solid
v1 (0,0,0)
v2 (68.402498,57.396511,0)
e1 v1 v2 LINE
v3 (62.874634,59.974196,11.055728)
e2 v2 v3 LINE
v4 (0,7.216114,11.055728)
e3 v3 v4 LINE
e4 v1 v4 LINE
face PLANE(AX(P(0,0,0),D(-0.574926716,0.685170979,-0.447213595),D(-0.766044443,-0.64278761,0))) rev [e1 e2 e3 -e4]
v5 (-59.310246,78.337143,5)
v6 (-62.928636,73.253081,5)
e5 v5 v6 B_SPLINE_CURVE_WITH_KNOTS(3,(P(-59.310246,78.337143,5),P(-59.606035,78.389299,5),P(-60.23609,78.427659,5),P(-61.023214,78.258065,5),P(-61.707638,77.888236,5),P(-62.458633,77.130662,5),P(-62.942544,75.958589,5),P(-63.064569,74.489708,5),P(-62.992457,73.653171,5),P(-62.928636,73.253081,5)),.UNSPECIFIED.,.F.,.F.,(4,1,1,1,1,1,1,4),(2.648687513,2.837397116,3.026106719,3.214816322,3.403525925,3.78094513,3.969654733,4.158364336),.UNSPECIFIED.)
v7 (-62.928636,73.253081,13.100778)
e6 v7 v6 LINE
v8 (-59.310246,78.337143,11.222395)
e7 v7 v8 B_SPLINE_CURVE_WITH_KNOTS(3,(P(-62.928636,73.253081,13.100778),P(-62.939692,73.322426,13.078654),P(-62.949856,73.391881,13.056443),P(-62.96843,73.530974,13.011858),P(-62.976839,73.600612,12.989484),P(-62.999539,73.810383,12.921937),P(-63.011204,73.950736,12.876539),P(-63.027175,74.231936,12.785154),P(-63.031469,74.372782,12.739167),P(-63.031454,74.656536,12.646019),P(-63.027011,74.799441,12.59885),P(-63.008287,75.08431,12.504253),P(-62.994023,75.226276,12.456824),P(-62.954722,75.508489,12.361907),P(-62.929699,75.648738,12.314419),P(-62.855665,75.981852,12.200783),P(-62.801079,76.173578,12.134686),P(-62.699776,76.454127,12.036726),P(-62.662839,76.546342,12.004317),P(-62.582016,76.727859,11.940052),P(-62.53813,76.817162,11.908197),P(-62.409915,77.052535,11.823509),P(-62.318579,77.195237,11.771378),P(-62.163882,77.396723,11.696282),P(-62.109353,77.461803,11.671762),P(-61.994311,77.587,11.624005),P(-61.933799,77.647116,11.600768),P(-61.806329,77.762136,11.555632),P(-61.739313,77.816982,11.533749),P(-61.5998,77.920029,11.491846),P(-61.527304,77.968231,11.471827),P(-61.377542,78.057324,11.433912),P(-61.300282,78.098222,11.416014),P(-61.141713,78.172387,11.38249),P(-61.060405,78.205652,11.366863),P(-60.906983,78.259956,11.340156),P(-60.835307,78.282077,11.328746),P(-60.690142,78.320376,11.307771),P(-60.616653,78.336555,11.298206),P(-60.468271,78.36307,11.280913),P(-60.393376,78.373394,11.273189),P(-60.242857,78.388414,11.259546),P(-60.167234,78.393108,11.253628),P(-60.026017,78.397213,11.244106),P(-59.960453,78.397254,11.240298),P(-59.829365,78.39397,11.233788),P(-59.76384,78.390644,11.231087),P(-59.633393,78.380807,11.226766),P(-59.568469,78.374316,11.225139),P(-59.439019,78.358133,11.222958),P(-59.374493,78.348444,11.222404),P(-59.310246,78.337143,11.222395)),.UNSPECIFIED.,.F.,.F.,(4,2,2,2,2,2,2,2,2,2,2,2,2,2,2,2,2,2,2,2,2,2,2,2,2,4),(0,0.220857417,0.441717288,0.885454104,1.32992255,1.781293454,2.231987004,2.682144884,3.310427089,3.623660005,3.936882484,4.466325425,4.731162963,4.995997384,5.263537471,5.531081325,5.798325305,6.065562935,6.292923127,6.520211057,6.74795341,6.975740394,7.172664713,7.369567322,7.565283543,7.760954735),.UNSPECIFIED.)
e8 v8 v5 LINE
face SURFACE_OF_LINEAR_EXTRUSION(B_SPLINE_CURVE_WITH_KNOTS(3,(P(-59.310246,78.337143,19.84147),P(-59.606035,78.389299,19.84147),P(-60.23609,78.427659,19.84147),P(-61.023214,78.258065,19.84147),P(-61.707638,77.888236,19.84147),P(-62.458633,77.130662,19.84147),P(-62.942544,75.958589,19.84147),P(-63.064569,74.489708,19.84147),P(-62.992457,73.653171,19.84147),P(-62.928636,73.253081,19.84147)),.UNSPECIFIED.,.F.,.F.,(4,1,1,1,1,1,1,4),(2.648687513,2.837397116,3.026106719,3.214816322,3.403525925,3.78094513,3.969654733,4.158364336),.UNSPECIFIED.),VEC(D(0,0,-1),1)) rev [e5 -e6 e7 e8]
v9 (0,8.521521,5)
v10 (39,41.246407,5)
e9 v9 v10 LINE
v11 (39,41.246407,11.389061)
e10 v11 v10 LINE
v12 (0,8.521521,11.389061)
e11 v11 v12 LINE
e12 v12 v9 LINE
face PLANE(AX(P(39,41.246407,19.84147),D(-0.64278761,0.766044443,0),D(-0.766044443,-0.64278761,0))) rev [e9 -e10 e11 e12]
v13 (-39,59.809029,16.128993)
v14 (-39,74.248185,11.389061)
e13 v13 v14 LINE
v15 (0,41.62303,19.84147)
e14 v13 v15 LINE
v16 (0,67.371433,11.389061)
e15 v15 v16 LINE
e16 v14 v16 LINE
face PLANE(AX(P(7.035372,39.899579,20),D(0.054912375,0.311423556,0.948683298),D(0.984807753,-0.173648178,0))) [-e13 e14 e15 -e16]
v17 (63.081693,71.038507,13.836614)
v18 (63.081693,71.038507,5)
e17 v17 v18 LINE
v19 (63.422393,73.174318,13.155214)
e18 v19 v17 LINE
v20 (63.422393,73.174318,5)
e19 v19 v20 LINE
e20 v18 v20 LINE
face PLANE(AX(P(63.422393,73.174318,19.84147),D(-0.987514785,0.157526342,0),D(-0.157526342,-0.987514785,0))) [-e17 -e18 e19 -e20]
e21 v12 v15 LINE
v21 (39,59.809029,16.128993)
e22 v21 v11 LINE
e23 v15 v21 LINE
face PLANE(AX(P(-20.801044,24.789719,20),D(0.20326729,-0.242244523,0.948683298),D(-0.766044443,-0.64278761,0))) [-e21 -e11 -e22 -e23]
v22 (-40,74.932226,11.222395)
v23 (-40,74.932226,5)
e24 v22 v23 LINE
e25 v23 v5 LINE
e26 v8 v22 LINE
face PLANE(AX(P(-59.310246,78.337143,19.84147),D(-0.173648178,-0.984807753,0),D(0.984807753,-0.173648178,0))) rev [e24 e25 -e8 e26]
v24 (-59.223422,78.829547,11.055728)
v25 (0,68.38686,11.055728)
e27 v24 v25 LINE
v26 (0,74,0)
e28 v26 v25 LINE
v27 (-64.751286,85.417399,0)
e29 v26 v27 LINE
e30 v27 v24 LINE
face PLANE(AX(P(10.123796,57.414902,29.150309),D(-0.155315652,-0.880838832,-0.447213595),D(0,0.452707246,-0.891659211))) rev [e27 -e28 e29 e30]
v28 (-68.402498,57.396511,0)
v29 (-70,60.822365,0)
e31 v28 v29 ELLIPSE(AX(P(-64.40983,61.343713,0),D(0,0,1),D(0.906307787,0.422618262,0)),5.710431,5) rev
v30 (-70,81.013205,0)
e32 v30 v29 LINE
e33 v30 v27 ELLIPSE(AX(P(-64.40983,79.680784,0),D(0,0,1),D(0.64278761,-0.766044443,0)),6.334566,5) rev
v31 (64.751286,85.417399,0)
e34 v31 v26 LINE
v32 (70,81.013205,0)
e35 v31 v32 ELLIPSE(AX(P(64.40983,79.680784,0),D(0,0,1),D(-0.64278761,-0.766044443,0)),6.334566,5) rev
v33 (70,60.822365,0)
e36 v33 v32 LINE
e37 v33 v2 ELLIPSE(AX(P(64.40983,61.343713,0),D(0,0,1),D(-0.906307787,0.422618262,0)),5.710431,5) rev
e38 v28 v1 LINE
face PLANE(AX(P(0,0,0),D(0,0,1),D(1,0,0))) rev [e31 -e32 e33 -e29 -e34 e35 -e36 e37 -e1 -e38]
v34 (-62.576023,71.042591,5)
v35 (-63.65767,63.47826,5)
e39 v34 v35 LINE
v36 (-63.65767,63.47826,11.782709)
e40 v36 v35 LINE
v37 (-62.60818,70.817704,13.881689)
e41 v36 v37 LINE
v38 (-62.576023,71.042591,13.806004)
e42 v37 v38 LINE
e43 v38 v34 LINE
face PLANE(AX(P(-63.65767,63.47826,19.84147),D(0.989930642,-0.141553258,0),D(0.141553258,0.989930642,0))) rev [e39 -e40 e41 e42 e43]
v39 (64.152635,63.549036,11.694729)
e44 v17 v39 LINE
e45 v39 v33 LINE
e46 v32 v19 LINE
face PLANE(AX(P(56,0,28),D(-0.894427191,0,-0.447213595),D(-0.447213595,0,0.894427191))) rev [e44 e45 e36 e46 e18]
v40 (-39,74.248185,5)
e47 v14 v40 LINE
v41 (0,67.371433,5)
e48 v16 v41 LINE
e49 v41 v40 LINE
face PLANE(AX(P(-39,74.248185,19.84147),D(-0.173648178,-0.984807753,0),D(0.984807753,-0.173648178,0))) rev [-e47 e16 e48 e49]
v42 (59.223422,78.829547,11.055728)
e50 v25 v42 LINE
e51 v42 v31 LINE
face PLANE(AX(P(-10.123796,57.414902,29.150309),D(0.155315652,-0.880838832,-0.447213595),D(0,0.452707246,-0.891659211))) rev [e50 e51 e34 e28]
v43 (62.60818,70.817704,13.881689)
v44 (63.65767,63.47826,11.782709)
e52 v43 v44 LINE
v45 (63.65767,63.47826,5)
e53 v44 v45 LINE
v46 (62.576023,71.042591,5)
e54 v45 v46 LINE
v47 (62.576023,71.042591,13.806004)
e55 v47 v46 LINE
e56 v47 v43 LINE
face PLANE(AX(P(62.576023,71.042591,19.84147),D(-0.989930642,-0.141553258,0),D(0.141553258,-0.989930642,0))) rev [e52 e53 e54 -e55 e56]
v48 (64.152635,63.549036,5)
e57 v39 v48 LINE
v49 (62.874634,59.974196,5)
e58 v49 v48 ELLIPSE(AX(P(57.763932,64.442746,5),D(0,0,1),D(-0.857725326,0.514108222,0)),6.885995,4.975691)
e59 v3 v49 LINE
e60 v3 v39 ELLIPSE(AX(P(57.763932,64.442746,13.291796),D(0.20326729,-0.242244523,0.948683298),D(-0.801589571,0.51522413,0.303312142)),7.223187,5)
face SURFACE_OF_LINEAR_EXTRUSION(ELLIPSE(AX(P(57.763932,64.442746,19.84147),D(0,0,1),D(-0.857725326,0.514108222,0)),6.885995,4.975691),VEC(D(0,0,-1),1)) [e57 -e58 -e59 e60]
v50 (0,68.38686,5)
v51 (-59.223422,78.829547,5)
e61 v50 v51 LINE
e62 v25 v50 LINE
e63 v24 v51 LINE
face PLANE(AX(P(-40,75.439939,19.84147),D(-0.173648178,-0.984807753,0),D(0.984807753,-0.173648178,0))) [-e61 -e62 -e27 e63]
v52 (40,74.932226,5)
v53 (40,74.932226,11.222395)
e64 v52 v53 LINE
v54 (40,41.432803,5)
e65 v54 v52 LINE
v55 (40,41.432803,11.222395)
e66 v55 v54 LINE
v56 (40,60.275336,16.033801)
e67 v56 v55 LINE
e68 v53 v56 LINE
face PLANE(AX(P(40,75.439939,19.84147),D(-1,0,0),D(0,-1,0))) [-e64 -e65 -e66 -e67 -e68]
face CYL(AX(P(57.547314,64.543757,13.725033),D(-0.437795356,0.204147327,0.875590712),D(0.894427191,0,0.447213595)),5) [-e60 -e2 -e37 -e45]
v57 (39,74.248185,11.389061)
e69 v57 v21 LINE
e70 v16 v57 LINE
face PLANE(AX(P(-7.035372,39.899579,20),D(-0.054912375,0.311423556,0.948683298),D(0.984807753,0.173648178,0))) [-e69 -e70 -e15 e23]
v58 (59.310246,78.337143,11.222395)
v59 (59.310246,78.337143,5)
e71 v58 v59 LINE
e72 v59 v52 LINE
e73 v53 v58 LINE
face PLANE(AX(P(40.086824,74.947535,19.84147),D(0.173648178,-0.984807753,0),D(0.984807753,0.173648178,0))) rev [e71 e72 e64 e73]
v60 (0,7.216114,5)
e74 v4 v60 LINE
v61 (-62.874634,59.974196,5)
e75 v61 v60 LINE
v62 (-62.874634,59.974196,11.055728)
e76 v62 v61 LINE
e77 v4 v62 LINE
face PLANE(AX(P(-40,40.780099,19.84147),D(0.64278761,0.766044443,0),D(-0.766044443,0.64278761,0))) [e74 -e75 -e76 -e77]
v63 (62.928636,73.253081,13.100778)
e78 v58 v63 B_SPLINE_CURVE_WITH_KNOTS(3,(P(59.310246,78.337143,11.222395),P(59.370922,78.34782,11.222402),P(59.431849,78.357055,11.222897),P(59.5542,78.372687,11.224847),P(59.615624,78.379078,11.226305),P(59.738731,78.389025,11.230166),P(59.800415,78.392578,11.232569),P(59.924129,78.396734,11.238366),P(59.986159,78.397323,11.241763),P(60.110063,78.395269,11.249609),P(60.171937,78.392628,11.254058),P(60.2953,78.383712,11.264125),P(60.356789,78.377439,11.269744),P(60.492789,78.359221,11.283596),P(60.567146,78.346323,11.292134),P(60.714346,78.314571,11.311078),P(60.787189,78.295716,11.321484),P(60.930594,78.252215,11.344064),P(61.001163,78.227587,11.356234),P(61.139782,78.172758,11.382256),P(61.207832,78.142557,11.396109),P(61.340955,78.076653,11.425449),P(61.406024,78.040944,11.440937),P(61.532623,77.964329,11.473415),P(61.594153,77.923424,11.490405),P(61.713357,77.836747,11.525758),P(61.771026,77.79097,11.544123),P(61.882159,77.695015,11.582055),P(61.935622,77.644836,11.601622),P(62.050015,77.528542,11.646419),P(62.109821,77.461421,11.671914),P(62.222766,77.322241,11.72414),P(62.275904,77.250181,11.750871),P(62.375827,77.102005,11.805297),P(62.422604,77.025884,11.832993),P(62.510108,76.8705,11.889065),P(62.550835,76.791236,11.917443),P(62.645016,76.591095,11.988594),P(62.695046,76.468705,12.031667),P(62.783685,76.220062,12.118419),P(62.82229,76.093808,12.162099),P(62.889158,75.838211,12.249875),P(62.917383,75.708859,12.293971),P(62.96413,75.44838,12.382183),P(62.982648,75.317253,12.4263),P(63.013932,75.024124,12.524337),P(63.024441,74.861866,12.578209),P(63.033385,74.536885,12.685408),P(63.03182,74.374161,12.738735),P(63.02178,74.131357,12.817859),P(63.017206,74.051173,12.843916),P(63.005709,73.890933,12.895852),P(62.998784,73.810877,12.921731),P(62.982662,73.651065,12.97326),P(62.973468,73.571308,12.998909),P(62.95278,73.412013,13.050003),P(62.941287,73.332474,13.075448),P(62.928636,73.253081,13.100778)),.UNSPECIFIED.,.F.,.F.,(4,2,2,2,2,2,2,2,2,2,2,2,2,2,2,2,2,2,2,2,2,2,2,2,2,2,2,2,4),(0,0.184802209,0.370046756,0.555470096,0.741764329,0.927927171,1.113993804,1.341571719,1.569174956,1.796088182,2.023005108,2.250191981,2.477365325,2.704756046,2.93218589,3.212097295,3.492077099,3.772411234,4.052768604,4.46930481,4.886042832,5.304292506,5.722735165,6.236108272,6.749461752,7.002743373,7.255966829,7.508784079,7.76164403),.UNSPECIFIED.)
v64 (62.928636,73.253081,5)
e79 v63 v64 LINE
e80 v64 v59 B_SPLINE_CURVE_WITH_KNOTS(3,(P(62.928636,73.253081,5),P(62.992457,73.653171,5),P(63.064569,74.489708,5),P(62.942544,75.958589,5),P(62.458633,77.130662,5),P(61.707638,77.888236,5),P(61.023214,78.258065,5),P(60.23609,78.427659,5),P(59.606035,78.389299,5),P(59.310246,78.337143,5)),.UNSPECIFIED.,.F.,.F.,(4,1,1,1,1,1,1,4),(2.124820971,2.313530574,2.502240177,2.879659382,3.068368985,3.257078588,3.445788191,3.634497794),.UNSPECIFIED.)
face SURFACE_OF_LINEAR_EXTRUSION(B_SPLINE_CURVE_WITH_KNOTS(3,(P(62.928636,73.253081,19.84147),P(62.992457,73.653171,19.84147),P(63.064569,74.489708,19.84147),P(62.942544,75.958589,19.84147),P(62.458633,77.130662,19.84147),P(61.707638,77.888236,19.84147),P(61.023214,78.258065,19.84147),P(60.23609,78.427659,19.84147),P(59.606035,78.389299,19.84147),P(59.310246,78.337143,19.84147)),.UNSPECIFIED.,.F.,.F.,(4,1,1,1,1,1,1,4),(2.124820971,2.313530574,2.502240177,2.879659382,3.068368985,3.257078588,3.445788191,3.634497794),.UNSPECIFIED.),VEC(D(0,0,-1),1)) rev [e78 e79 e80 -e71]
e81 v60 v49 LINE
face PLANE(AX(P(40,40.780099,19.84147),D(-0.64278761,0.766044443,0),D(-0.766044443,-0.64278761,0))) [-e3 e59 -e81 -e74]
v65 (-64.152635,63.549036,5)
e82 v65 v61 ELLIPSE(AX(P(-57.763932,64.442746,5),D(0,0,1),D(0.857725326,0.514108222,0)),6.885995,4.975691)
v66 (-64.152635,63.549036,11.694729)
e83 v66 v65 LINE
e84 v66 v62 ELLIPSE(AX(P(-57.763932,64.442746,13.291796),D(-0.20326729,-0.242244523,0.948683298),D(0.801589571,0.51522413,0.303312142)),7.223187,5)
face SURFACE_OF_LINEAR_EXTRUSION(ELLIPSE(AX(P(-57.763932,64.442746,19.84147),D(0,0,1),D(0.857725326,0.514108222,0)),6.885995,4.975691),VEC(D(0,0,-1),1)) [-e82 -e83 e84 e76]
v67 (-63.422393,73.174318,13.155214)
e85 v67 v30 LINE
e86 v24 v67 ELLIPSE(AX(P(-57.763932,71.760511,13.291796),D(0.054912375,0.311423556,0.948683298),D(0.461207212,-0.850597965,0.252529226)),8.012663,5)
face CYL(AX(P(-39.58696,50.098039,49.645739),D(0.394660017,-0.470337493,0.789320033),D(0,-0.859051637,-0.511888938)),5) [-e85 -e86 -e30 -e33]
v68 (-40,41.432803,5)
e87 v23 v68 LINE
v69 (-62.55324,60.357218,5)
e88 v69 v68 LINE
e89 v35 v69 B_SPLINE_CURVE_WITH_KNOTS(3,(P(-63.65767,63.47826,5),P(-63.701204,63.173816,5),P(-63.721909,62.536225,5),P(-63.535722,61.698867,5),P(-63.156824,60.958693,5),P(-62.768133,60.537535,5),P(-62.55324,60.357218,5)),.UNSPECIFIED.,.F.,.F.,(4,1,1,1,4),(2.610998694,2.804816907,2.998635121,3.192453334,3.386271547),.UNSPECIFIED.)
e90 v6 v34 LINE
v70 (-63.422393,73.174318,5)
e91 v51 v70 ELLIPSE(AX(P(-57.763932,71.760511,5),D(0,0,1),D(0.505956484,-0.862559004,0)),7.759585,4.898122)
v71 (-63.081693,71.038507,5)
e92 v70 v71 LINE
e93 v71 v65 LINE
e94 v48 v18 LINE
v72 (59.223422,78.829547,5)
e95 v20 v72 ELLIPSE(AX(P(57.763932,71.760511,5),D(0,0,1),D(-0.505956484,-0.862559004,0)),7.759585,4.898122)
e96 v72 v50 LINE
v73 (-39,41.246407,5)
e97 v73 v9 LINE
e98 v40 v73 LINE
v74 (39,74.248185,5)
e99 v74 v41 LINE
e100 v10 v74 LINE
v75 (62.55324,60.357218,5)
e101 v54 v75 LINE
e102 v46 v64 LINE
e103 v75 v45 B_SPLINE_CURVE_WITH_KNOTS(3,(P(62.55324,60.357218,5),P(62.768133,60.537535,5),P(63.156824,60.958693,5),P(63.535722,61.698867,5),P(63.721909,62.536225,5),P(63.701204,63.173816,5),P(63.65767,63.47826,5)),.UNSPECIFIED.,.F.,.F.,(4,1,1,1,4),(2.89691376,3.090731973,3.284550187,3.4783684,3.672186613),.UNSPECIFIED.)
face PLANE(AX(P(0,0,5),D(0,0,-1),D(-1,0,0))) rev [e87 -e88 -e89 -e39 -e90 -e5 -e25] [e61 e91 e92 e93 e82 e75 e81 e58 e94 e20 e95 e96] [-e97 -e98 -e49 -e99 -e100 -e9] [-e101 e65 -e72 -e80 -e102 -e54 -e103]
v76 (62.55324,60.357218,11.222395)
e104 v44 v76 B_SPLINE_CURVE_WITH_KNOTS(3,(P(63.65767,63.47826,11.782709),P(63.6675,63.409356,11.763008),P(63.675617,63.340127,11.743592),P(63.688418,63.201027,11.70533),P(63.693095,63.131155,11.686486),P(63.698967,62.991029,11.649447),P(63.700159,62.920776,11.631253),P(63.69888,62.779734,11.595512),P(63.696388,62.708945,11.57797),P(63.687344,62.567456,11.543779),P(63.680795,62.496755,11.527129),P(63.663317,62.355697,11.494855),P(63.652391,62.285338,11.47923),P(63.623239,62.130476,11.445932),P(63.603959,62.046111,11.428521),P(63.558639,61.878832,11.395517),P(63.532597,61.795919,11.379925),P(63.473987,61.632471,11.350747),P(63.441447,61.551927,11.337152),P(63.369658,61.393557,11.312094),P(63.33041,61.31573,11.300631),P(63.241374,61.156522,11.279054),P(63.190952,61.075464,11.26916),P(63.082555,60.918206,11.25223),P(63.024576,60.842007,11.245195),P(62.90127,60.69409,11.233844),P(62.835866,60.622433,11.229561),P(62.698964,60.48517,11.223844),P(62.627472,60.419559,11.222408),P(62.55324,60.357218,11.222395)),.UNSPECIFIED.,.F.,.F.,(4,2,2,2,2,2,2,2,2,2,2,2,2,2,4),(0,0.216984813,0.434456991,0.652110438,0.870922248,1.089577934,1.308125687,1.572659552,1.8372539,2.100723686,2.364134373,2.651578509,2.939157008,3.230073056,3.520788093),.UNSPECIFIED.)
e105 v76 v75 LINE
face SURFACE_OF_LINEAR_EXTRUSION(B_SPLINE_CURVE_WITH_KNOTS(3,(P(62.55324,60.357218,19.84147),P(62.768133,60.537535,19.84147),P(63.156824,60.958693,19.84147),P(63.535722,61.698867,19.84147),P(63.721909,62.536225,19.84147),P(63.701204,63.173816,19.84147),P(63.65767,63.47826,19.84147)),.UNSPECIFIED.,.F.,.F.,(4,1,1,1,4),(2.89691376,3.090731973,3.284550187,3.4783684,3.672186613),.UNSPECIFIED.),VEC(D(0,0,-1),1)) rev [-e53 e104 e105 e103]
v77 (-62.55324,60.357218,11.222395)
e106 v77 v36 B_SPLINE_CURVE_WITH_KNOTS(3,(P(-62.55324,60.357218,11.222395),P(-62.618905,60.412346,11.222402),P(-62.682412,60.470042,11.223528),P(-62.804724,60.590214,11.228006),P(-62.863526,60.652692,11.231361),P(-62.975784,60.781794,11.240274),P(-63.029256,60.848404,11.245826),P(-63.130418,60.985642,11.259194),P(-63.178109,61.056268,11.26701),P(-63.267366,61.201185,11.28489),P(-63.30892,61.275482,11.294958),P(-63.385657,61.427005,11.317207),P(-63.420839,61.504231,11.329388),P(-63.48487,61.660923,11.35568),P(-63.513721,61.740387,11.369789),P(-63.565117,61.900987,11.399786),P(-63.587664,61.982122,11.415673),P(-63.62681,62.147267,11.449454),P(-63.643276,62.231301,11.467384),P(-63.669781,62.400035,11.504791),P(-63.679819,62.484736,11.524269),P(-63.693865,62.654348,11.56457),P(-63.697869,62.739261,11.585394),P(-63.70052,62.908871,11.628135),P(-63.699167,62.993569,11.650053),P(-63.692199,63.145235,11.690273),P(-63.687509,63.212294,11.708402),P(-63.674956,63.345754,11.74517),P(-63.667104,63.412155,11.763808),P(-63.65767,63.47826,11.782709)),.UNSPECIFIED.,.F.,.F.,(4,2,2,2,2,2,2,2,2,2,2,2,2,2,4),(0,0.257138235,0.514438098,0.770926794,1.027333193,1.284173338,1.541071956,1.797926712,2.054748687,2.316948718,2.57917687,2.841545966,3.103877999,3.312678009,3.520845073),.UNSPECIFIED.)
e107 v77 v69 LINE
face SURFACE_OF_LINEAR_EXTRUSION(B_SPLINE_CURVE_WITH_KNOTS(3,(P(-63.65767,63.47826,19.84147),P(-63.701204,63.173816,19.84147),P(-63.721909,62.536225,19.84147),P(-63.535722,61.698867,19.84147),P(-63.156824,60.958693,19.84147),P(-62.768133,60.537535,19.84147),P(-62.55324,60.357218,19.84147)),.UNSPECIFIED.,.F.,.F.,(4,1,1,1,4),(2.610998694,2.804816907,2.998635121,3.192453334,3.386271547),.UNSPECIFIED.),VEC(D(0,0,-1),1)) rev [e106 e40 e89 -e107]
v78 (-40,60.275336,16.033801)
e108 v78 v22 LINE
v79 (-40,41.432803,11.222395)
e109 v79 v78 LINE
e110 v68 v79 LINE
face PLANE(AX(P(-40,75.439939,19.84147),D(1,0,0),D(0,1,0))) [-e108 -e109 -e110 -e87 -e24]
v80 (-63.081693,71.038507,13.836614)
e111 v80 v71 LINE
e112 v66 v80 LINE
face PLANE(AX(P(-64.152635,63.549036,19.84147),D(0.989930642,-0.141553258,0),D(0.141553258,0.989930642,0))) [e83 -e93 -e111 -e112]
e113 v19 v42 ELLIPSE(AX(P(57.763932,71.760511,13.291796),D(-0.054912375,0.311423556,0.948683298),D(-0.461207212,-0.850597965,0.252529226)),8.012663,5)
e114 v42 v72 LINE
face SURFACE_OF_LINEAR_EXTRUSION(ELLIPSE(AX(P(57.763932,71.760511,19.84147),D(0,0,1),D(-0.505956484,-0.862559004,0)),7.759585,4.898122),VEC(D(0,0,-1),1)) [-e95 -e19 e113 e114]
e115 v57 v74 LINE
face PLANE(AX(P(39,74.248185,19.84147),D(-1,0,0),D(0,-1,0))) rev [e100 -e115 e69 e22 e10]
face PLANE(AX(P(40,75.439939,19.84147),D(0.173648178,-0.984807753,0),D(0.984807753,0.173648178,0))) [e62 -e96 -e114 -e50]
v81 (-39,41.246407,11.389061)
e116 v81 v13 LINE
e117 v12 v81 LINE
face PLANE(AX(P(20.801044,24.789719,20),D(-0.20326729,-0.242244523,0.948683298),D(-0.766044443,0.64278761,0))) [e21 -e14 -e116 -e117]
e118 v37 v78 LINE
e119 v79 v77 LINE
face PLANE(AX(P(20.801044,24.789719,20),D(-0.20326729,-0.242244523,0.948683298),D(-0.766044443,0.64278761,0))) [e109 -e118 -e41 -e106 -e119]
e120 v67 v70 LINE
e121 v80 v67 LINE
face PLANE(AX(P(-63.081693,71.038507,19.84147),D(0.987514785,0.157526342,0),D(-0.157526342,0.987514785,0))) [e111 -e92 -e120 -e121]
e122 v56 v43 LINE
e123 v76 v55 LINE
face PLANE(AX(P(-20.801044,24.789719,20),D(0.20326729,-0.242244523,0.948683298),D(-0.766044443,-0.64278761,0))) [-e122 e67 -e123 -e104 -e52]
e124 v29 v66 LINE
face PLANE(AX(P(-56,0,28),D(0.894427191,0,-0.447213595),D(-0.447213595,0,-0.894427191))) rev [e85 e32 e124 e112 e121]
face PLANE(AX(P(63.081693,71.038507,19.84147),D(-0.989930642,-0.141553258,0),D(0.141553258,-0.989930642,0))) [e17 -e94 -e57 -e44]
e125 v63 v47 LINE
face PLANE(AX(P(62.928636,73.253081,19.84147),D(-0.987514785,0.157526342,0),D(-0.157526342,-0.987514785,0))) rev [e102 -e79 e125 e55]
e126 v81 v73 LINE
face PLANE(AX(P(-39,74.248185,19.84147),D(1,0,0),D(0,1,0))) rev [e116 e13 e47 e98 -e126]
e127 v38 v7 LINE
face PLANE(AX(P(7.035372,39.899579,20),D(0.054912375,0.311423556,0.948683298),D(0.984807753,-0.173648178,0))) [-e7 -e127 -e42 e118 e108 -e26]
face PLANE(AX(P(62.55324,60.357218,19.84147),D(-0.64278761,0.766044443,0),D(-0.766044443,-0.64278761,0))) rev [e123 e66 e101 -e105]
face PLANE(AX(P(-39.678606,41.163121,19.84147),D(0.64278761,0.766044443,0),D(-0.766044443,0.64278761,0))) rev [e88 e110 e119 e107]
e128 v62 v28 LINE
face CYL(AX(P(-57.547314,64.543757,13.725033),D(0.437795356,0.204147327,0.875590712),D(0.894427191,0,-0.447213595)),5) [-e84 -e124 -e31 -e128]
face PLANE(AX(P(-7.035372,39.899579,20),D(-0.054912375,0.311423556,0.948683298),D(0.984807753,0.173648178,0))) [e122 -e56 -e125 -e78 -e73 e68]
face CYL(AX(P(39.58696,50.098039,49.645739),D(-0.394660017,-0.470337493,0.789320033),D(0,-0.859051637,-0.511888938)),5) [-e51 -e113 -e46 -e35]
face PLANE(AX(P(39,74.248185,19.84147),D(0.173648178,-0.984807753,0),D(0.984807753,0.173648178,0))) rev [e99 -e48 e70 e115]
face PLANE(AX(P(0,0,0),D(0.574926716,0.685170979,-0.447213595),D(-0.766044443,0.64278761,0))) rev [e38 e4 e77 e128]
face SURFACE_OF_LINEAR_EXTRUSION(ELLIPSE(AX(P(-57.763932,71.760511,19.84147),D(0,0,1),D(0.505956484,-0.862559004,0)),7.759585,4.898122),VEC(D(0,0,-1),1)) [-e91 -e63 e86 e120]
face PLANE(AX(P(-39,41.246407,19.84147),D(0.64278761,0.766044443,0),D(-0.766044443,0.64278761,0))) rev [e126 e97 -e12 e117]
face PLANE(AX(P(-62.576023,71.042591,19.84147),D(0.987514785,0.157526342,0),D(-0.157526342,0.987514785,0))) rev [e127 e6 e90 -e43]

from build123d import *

# Parameters (mm, degrees)
CHAMFER_1_SIZE      = 10
CHAMFER_1_SIZE_2    = 22.360679775
FILLET_3_R          = 5
CUT_EXTRUDE_START   = 5
CUT_EXTRUDE_2_DEPTH = 108.268120159
CUT_EXTRUDE_3_DEPTH = 108.268120141


with BuildPart() as part:
    # 草图1 → 放样1 section 0
    with BuildSketch(Plane.XY):
        with BuildLine():
            Line((0, 74), (70, 86.34288865))
            Line((70, 86.34288865), (70, 58.736974182))
            Line((70, 58.736974182), (0, 0))
            Line((0, 0), (-70, 58.736974182))
            Line((-70, 58.736974182), (-70, 86.34288865))
            Line((-70, 86.34288865), (0, 74))
        make_face()
    # 草图2 → 放样1 section 1
    with BuildSketch(Plane.XY.offset(20)):
        with BuildLine():
            Line((60, 74.425352724), (0, 63.845733881))
            Line((0, 63.845733881), (-60, 74.425352724))
            Line((-60, 74.425352724), (-60, 63.400050764))
            Line((-60, 63.400050764), (0, 13.054072893))
            Line((0, 13.054072893), (60, 63.400050764))
            Line((60, 63.400050764), (60, 74.425352724))
        make_face()
    loft()

    # 倒角1
    # the kernel refuses this chamfer: 22.360679775, 10 mm, written as the material it takes off along each edge
    with BuildSketch(Plane(origin=(57.145762753, 53.769394075, 20), x_dir=(0.07765782588644504, 0.44041941610082364, -0.8944271909999159), z_dir=(-0.9848077530122075, 0.17364817766693405, 0))) as chamfer_1_piece_1_section:
        Polygon((CHAMFER_1_SIZE, 0), (-CHAMFER_1_SIZE_2 * 0.4472135955, CHAMFER_1_SIZE_2 * 0.894427191), (0, 0), align=None)
    chamfer_1_piece_1 = extrude(amount=176.980253225, mode=Mode.PRIVATE)
    chamfer_1_piece_1 = split(chamfer_1_piece_1, bisect_by=Plane(origin=(57.189420764, 53.521797191, 19.245750606), z_dir=(-0.05491237529650921, 0.3114235556911101, 0.9486832980505147)), keep=Keep.TOP, mode=Mode.PRIVATE)
    add(chamfer_1_piece_1, mode=Mode.SUBTRACT)
    with BuildSketch(Plane(origin=(117.145762753, 84.50169253, 20), x_dir=(-0.0776578258864451, 0.4404194161008233, -0.8944271909999161), z_dir=(-0.9848077530122074, -0.1736481776669343, 0))) as chamfer_1_piece_2_section:
        Polygon((CHAMFER_1_SIZE, 0), (-CHAMFER_1_SIZE_2 * 0.4472135955, CHAMFER_1_SIZE_2 * 0.894427191), (0, 0), align=None)
    chamfer_1_piece_2 = extrude(amount=176.980253225, mode=Mode.PRIVATE)
    chamfer_1_piece_2 = split(chamfer_1_piece_2, bisect_by=Plane(origin=(116.05099823, 78.292974393, 1.086507133), z_dir=(0.054912375296509185, 0.31142355569111035, 0.9486832980505147)), keep=Keep.TOP, mode=Mode.PRIVATE)
    add(chamfer_1_piece_2, mode=Mode.SUBTRACT)
    with BuildSketch(Plane(origin=(-44.451512359, -24.245174733, 20), x_dir=(0.28746335807073986, -0.34258548972000163, -0.894427190999916), z_dir=(0.7660444431189795, 0.6427876096865376, 0)), Plane(origin=(-104.451512359, 100.69929839, 20), x_dir=(-0.28746335807074064, -0.3425854897200026, -0.8944271909999154), z_dir=(0.7660444431189795, -0.6427876096865376, 0))) as chamfer_1_piece_3:
        Polygon((CHAMFER_1_SIZE, 0), (-CHAMFER_1_SIZE_2 * 0.4472135955, CHAMFER_1_SIZE_2 * 0.894427191), (0, 0), align=None)
    extrude(amount=194.379093872, mode=Mode.SUBTRACT)

    # 圆角3
    fillet_3_edges = [part.edges().sort_by_distance(p)[0] for p in [
        (-67.236067978, 60.025816851, 5.527864045),
        (-67.236067978, 83.048962732, 5.527864045),
        (67.236067977, 60.025816851, 5.527864045),
        (67.236067977, 83.048962732, 5.527864045),
    ]]
    fillet(fillet_3_edges, radius=FILLET_3_R)

    # 草图7 → 切除-拉伸2 (cut, through all)
    with BuildSketch(Plane.XY.offset(CUT_EXTRUDE_START)):
        Polygon((-40, 75.43993897), (-40, 40.780099266), (0, 7.216114019), (40, 40.780099266), (40, 75.43993897), (0, 68.386859742), align=None)
        Polygon((-39, 74.248185378), (0, 67.37143313), (39, 74.248185378), (39, 41.246406924), (0, 8.521521308), (-39, 41.246406924), align=None, mode=Mode.SUBTRACT)
    extrude(amount=CUT_EXTRUDE_2_DEPTH, mode=Mode.SUBTRACT)

    # 草图9 → 切除-拉伸3 (cut, through all)
    with BuildSketch(Plane.XY.offset(CUT_EXTRUDE_START)):
        with BuildLine():
            Line((-40, 75.43993897), (0, 68.386859742))
            Line((0, 68.386859742), (40, 75.43993897))
            Line((40, 75.43993897), (59.223421741, 78.829546885))
            add(Edge.make_bspline(
                [(63.422393112, 73.174317919), (64.472135955, 79.755036815), (59.223421741, 78.829546885)],
                knots=[2.124820971, 2.124820971, 2.124820971, 3.634497794, 3.634497794, 3.634497794], degree=2, weights=[1, 0.728382268, 1]))
            Line((63.422393112, 73.174317919), (63.081692851, 71.038506602))
            Line((63.081692851, 71.038506602), (64.15263548, 63.549036282))
            add(Edge.make_bspline(
                [(62.874633581, 59.974195867), (64.472135955, 61.31465952), (64.15263548, 63.549036282)],
                knots=[2.89691376, 2.89691376, 2.89691376, 3.672186613, 3.672186613, 3.672186613], degree=2, weights=[1, 0.925805079, 1]))
            Line((62.874633581, 59.974195867), (40, 40.780099266))
            Line((40, 40.780099266), (0, 7.216114019))
            Line((0, 7.216114019), (-40, 40.780099266))
            Line((-40, 40.780099266), (-62.874633581, 59.974195867))
            add(Edge.make_bspline(
                [(-64.15263548, 63.549036282), (-64.472135955, 61.31465952), (-62.874633581, 59.974195867)],
                knots=[2.610998694, 2.610998694, 2.610998694, 3.386271547, 3.386271547, 3.386271547], degree=2, weights=[1, 0.925805079, 1]))
            Line((-64.15263548, 63.549036282), (-63.081692851, 71.038506602))
            Line((-63.081692851, 71.038506602), (-63.422393112, 73.174317919))
            add(Edge.make_bspline(
                [(-59.223421741, 78.829546885), (-64.472135955, 79.755036815), (-63.422393112, 73.174317919)],
                knots=[2.648687513, 2.648687513, 2.648687513, 4.158364336, 4.158364336, 4.158364336], degree=2, weights=[1, 0.728382268, 1]))
            Line((-59.223421741, 78.829546885), (-40, 75.43993897))
        make_face()
        with BuildLine():
            Line((-59.31024583, 78.337143008), (-40.086824089, 74.947535094))
            Line((-40.086824089, 74.947535094), (0, 67.879146436))
            Line((0, 67.879146436), (40.086824089, 74.947535094))
            Line((40.086824089, 74.947535094), (59.31024583, 78.337143008))
            add(Edge.make_bspline(
                [(59.31024583, 78.337143008), (59.606035397, 78.389298689), (60.236089665, 78.427658938), (61.023214098, 78.258065344), (61.707637648, 77.888235871), (62.45863279, 77.130661919), (62.942544445, 75.958588793), (63.064569227, 74.489707699), (62.992457265, 73.653171126), (62.92863572, 73.253081091)],
                knots=[2.124820971, 2.124820971, 2.124820971, 2.124820971, 2.313530574, 2.502240177, 2.69094978, 2.879659382, 3.257078588, 3.445788191, 3.634497794, 3.634497794, 3.634497794, 3.634497794], degree=3))
            Line((62.92863572, 73.253081091), (62.576022888, 71.04259122))
            Line((62.576022888, 71.04259122), (63.657670159, 63.478259653))
            add(Edge.make_bspline(
                [(63.657670159, 63.478259653), (63.701203567, 63.173815556), (63.721909403, 62.536225056), (63.535721886, 61.698867433), (63.156823887, 60.958692701), (62.768132959, 60.537534879), (62.553239776, 60.357218088)],
                knots=[2.89691376, 2.89691376, 2.89691376, 2.89691376, 3.090731973, 3.284550187, 3.4783684, 3.672186613, 3.672186613, 3.672186613, 3.672186613], degree=3))
            Line((62.553239776, 60.357218088), (39.678606195, 41.163121487))
            Line((39.678606195, 41.163121487), (0, 7.868817663))
            Line((0, 7.868817663), (-39.678606195, 41.163121487))
            Line((-39.678606195, 41.163121487), (-62.553239776, 60.357218088))
            add(Edge.make_bspline(
                [(-62.553239776, 60.357218088), (-62.768132959, 60.537534879), (-63.156823887, 60.958692701), (-63.535721886, 61.698867433), (-63.721909403, 62.536225056), (-63.701203567, 63.173815556), (-63.657670159, 63.478259653)],
                knots=[2.610998694, 2.610998694, 2.610998694, 2.610998694, 2.804816907, 2.998635121, 3.192453334, 3.386271547, 3.386271547, 3.386271547, 3.386271547], degree=3))
            Line((-63.657670159, 63.478259653), (-62.576022888, 71.04259122))
            Line((-62.576022888, 71.04259122), (-62.92863572, 73.253081091))
            add(Edge.make_bspline(
                [(-62.92863572, 73.253081091), (-62.992457265, 73.653171126), (-63.064569227, 74.489707699), (-62.942544445, 75.958588793), (-62.45863279, 77.130661919), (-61.707637648, 77.888235871), (-61.023214098, 78.258065344), (-60.236089665, 78.427658938), (-59.606035397, 78.389298689), (-59.31024583, 78.337143008)],
                knots=[2.648687513, 2.648687513, 2.648687513, 2.648687513, 2.837397116, 3.026106719, 3.403525925, 3.592235528, 3.78094513, 3.969654733, 4.158364336, 4.158364336, 4.158364336, 4.158364336], degree=3))
        make_face(mode=Mode.SUBTRACT)
    extrude(amount=CUT_EXTRUDE_3_DEPTH, mode=Mode.SUBTRACT)


solid = part.part
